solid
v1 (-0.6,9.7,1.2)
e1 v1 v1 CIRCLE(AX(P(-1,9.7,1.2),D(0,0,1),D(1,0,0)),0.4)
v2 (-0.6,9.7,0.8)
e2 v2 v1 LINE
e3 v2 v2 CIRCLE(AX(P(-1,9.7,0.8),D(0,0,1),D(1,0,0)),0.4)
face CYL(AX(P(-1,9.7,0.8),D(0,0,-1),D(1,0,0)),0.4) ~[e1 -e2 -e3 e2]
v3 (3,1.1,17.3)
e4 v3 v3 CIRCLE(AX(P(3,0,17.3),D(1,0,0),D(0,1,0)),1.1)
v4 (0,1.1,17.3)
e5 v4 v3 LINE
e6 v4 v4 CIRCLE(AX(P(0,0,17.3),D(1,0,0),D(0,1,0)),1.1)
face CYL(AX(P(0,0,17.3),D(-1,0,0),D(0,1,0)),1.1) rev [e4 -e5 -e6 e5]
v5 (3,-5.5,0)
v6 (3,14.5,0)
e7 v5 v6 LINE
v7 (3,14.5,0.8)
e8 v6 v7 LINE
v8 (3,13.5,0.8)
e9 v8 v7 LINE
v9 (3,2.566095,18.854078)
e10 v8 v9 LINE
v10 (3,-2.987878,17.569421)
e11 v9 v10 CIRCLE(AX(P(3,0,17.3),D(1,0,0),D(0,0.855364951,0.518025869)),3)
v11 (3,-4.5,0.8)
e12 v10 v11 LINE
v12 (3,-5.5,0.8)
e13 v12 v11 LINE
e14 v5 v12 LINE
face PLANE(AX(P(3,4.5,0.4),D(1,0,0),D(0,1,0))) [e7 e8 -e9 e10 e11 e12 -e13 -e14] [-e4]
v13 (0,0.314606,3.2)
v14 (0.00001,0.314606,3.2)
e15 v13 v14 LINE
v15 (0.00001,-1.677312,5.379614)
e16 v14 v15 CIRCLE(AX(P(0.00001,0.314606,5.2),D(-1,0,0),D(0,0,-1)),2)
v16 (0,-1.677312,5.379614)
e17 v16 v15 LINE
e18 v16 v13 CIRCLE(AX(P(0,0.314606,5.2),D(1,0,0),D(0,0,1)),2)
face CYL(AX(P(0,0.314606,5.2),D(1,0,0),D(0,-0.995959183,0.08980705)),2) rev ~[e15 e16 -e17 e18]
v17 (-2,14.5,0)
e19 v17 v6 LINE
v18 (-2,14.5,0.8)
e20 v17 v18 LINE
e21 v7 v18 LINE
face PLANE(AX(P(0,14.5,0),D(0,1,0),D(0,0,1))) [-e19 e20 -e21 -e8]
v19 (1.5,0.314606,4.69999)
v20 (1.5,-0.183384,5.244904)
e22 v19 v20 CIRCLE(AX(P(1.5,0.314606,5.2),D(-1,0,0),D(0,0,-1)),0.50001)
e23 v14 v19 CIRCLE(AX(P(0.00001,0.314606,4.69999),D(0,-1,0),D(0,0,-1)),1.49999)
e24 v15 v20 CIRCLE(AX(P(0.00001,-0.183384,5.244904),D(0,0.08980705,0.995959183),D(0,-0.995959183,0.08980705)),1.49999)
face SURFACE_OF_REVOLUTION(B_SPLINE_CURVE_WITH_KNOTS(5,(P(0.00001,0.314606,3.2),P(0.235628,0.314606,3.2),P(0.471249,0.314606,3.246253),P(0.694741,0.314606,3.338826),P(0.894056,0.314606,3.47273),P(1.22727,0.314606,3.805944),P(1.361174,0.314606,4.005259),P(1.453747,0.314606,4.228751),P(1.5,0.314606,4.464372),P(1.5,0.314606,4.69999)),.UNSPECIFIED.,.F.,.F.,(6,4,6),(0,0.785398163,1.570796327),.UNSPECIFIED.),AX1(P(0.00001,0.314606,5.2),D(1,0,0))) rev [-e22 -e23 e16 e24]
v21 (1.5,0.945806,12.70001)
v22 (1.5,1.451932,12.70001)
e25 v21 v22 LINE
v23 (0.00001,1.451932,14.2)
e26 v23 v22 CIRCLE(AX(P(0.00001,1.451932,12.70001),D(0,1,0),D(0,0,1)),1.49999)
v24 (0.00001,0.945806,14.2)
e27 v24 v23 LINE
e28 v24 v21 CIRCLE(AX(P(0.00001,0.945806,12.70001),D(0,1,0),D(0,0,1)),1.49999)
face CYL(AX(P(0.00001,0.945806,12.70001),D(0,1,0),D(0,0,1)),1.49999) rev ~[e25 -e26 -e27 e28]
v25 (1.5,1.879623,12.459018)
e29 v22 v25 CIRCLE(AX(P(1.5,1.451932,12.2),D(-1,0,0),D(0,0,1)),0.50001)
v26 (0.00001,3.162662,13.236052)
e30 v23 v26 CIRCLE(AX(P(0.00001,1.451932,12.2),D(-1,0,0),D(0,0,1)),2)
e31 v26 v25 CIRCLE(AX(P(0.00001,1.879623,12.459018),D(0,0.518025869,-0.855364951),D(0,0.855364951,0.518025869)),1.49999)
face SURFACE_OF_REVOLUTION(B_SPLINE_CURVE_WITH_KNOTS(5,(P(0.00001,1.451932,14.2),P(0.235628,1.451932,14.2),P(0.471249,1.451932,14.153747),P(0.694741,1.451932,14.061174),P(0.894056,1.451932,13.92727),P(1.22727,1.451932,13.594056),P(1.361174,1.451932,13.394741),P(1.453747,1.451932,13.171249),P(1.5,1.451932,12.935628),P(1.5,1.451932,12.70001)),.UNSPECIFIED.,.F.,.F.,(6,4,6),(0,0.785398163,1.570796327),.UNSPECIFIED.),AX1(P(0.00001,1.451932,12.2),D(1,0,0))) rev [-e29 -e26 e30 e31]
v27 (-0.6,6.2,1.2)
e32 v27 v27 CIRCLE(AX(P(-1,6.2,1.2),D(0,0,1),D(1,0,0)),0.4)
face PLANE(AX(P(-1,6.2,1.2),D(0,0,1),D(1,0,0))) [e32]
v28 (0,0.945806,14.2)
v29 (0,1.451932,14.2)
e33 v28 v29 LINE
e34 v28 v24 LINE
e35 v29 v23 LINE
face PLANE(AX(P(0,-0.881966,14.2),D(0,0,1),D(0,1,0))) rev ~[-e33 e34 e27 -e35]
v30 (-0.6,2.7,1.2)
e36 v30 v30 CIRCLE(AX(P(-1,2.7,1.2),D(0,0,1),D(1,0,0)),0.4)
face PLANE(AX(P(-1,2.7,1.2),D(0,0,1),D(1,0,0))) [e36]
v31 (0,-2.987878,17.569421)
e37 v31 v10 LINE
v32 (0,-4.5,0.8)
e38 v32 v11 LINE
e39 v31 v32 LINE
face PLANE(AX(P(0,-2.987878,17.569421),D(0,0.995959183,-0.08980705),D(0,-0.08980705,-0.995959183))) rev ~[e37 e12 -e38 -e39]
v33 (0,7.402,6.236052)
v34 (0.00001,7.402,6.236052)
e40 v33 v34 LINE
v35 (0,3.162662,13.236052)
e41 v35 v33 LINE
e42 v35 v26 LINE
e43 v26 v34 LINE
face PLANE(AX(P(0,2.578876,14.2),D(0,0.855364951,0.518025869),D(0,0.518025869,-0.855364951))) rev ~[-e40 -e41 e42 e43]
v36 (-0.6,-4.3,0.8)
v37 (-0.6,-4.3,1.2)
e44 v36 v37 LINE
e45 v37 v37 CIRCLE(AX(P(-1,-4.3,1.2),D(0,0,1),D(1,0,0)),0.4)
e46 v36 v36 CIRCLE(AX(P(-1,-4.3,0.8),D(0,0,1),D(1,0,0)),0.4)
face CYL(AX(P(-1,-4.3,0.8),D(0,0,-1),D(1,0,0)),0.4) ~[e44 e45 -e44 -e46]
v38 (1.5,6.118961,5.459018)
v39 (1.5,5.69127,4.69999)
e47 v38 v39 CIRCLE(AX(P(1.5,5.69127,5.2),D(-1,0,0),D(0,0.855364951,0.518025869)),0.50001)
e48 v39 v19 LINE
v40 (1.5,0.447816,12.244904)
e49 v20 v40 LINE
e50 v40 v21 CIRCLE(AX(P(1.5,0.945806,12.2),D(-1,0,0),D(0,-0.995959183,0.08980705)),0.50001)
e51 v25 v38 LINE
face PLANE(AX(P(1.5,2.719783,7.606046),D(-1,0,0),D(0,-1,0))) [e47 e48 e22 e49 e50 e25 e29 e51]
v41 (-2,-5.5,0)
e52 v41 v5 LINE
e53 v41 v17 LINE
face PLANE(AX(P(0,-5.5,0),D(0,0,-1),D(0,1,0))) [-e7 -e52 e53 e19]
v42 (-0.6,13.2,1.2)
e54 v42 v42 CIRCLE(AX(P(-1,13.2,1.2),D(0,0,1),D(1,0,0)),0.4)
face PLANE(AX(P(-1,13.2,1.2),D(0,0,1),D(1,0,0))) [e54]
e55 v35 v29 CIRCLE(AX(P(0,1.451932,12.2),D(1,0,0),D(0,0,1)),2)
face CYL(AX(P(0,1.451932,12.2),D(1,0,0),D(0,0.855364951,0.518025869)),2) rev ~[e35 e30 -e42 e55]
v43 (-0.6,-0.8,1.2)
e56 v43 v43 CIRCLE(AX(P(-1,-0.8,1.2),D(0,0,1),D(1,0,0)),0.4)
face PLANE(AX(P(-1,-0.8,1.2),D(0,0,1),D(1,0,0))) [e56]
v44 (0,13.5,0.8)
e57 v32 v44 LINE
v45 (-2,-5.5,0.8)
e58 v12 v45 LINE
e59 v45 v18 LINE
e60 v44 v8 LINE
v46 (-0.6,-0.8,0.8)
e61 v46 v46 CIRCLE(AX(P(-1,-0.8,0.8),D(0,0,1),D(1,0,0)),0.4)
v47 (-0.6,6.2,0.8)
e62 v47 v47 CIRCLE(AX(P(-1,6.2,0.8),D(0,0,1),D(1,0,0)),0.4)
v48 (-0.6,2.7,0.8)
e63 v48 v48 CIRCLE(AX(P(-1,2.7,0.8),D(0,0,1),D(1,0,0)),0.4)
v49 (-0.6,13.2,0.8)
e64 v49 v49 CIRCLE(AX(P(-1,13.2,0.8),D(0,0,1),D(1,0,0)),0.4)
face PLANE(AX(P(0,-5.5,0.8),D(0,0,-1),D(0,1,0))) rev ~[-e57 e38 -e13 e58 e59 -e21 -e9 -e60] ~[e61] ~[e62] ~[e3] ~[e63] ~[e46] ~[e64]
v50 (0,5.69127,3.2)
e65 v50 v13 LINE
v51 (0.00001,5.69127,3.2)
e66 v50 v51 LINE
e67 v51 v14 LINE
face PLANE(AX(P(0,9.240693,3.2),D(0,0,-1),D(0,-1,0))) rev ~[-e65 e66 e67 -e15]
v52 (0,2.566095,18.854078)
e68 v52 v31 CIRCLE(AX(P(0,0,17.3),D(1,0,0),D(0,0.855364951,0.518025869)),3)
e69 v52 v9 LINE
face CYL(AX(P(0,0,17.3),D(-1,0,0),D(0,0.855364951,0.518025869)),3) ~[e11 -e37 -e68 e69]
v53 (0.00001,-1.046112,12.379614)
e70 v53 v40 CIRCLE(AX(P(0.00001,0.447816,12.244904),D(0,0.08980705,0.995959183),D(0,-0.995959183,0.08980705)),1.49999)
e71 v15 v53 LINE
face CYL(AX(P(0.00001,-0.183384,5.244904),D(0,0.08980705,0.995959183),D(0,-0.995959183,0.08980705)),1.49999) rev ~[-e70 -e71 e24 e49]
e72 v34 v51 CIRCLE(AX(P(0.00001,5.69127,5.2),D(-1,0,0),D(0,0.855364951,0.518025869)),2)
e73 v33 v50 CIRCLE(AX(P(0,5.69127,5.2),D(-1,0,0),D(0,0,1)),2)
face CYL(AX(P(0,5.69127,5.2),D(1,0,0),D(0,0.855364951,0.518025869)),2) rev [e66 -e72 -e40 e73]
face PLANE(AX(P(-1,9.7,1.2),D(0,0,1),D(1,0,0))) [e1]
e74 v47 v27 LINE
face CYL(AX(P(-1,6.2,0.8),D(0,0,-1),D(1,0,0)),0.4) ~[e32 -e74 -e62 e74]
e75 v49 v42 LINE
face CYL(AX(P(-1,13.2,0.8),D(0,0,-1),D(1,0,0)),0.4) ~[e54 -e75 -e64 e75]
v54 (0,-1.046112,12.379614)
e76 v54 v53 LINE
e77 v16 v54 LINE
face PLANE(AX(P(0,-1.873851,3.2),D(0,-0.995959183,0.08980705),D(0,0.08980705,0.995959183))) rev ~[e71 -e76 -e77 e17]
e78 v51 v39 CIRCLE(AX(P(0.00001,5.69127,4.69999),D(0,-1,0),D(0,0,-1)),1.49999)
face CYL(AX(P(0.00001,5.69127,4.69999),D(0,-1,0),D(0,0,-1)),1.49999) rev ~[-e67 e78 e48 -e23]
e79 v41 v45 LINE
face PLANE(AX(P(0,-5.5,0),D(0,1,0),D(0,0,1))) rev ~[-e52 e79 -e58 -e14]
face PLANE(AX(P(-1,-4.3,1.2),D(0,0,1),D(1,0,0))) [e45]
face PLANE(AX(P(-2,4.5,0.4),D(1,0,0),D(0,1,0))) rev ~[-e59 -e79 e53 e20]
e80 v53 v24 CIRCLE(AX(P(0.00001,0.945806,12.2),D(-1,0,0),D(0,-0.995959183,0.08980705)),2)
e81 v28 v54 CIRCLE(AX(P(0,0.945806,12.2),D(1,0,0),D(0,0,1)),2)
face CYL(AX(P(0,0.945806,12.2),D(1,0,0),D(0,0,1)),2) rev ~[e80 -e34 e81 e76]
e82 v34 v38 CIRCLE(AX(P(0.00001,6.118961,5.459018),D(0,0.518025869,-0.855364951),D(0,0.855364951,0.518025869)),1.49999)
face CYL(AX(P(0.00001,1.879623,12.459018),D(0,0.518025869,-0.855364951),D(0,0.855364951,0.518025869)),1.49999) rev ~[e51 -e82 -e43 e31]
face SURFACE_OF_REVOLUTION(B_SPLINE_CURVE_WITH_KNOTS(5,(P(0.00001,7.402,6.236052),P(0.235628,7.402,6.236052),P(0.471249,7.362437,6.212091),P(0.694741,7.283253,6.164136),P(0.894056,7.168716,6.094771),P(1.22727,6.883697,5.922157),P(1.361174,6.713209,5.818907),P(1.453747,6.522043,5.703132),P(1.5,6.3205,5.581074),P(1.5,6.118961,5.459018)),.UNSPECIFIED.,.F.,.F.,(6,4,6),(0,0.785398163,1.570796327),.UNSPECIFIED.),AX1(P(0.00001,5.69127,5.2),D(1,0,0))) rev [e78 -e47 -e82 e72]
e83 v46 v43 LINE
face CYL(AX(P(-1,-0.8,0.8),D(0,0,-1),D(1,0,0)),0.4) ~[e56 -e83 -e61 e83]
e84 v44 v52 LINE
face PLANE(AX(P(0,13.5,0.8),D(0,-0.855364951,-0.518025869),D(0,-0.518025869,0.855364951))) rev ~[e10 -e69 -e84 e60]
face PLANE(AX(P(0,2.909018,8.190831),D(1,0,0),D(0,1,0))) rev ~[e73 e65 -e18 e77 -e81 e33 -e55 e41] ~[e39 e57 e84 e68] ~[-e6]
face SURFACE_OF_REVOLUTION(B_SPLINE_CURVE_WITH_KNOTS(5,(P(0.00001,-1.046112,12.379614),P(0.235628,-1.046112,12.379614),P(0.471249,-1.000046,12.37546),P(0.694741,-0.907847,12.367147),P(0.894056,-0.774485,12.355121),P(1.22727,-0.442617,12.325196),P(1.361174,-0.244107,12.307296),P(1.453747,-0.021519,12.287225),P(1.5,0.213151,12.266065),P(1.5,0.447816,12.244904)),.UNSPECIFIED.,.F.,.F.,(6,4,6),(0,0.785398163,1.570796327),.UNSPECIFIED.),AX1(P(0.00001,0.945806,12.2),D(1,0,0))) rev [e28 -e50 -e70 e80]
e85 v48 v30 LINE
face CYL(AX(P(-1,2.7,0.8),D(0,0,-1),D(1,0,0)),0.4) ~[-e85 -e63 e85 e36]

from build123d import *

# Parameters (mm, degrees)
F0_W          = 20
F0_H          = 0.8
F1_DEPTH      = 3
F1_DEPTH_BACK = 2
F2_R          = 1.1
F3_DEPTH      = 3
F5_DEPTH      = 1.5
F6_R          = 2
F7_R          = 1.49999
F8_R          = 0.4
F9_DEPTH      = 0.4


# Not quite as in the source:
# - a fillet or chamfer is up to 0.001 mm smaller than in the source, because OpenCascade refuses the exact size


with BuildPart() as f1:
    # F0 (on Right) → F1 (new body, two sides)
    with BuildSketch(Plane.YZ) as f1_sk:
        with Locations((4.5, 0.4)):
            Rectangle(F0_W, F0_H)
    extrude(amount=F1_DEPTH)
    extrude(f1_sk.sketch, amount=-F1_DEPTH_BACK)

    # F2 (on Right) → F3 (join)
    with BuildSketch(Plane.YZ):
        with BuildLine():
            Line((-4.5, 0.8), (13.5, 0.8))
            Line((13.5, 0.8), (2.5660948526, 18.8540776067))
            ThreePointArc((2.5660948526, 18.8540776067), (-0.6760626552, 20.2228306975), (-2.9878775484, 17.5694211496))
            Line((-2.9878775484, 17.5694211496), (-4.5, 0.8))
        make_face()
        with Locations((0, 17.3)):
            Circle(F2_R, mode=Mode.SUBTRACT)
    extrude(amount=F3_DEPTH)

    # F4 (on face) → F5 (cut)
    with BuildSketch(Plane(origin=(0, 0, 0), x_dir=(0, -1, 0), z_dir=(-1, 0, 0))):
        Polygon((-9.2406928099, 3.2), (1.8738512935, 3.2), (0.8819657168, 14.2), (-2.5788760591, 14.2), align=None)
    extrude(amount=-F5_DEPTH, mode=Mode.SUBTRACT)

    # F6
    f6_edges = [f1.edges().sort_by_distance(p)[0] for p in [
        (0.75, -0.881966, 14.2),
        (0.75, 2.578876, 14.2),
        (0.75, 9.240693, 3.2),
        (0.75, -1.873851, 3.2),
    ]]
    fillet(f6_edges, radius=F6_R)

    # F7 (radius 1.5 in the source; OpenCascade refuses exactly that, so slightly less here)
    f7_edges = [f1.edges().sort_by_distance(p)[0] for p in [
        (1.5, 3.002938, 3.2),
        (1.5, 7.433697, 4.218191),
        (1.5, -1.161746, 3.850783),
        (1.5, 5.282331, 9.736052),
        (1.5, -1.361712, 8.879614),
        (1.5, 2.433741, 13.942427),
        (1.5, -0.403411, 13.676352),
        (1.5, 1.198869, 14.2),
    ]]
    fillet(f7_edges, radius=F7_R)

    # F8 (on face) → F9 (join)
    with BuildSketch(Plane.XY.offset(0.8)):
        with Locations((-1, -4.3)):
            Circle(F8_R)
        with Locations((-1, -0.8)):
            Circle(F8_R)
        with Locations((-1, 2.7)):
            Circle(F8_R)
        with Locations((-1, 6.2)):
            Circle(F8_R)
        with Locations((-1, 9.7)):
            Circle(F8_R)
        with Locations((-1, 13.2)):
            Circle(F8_R)
    extrude(amount=F9_DEPTH)


solid = f1.part
